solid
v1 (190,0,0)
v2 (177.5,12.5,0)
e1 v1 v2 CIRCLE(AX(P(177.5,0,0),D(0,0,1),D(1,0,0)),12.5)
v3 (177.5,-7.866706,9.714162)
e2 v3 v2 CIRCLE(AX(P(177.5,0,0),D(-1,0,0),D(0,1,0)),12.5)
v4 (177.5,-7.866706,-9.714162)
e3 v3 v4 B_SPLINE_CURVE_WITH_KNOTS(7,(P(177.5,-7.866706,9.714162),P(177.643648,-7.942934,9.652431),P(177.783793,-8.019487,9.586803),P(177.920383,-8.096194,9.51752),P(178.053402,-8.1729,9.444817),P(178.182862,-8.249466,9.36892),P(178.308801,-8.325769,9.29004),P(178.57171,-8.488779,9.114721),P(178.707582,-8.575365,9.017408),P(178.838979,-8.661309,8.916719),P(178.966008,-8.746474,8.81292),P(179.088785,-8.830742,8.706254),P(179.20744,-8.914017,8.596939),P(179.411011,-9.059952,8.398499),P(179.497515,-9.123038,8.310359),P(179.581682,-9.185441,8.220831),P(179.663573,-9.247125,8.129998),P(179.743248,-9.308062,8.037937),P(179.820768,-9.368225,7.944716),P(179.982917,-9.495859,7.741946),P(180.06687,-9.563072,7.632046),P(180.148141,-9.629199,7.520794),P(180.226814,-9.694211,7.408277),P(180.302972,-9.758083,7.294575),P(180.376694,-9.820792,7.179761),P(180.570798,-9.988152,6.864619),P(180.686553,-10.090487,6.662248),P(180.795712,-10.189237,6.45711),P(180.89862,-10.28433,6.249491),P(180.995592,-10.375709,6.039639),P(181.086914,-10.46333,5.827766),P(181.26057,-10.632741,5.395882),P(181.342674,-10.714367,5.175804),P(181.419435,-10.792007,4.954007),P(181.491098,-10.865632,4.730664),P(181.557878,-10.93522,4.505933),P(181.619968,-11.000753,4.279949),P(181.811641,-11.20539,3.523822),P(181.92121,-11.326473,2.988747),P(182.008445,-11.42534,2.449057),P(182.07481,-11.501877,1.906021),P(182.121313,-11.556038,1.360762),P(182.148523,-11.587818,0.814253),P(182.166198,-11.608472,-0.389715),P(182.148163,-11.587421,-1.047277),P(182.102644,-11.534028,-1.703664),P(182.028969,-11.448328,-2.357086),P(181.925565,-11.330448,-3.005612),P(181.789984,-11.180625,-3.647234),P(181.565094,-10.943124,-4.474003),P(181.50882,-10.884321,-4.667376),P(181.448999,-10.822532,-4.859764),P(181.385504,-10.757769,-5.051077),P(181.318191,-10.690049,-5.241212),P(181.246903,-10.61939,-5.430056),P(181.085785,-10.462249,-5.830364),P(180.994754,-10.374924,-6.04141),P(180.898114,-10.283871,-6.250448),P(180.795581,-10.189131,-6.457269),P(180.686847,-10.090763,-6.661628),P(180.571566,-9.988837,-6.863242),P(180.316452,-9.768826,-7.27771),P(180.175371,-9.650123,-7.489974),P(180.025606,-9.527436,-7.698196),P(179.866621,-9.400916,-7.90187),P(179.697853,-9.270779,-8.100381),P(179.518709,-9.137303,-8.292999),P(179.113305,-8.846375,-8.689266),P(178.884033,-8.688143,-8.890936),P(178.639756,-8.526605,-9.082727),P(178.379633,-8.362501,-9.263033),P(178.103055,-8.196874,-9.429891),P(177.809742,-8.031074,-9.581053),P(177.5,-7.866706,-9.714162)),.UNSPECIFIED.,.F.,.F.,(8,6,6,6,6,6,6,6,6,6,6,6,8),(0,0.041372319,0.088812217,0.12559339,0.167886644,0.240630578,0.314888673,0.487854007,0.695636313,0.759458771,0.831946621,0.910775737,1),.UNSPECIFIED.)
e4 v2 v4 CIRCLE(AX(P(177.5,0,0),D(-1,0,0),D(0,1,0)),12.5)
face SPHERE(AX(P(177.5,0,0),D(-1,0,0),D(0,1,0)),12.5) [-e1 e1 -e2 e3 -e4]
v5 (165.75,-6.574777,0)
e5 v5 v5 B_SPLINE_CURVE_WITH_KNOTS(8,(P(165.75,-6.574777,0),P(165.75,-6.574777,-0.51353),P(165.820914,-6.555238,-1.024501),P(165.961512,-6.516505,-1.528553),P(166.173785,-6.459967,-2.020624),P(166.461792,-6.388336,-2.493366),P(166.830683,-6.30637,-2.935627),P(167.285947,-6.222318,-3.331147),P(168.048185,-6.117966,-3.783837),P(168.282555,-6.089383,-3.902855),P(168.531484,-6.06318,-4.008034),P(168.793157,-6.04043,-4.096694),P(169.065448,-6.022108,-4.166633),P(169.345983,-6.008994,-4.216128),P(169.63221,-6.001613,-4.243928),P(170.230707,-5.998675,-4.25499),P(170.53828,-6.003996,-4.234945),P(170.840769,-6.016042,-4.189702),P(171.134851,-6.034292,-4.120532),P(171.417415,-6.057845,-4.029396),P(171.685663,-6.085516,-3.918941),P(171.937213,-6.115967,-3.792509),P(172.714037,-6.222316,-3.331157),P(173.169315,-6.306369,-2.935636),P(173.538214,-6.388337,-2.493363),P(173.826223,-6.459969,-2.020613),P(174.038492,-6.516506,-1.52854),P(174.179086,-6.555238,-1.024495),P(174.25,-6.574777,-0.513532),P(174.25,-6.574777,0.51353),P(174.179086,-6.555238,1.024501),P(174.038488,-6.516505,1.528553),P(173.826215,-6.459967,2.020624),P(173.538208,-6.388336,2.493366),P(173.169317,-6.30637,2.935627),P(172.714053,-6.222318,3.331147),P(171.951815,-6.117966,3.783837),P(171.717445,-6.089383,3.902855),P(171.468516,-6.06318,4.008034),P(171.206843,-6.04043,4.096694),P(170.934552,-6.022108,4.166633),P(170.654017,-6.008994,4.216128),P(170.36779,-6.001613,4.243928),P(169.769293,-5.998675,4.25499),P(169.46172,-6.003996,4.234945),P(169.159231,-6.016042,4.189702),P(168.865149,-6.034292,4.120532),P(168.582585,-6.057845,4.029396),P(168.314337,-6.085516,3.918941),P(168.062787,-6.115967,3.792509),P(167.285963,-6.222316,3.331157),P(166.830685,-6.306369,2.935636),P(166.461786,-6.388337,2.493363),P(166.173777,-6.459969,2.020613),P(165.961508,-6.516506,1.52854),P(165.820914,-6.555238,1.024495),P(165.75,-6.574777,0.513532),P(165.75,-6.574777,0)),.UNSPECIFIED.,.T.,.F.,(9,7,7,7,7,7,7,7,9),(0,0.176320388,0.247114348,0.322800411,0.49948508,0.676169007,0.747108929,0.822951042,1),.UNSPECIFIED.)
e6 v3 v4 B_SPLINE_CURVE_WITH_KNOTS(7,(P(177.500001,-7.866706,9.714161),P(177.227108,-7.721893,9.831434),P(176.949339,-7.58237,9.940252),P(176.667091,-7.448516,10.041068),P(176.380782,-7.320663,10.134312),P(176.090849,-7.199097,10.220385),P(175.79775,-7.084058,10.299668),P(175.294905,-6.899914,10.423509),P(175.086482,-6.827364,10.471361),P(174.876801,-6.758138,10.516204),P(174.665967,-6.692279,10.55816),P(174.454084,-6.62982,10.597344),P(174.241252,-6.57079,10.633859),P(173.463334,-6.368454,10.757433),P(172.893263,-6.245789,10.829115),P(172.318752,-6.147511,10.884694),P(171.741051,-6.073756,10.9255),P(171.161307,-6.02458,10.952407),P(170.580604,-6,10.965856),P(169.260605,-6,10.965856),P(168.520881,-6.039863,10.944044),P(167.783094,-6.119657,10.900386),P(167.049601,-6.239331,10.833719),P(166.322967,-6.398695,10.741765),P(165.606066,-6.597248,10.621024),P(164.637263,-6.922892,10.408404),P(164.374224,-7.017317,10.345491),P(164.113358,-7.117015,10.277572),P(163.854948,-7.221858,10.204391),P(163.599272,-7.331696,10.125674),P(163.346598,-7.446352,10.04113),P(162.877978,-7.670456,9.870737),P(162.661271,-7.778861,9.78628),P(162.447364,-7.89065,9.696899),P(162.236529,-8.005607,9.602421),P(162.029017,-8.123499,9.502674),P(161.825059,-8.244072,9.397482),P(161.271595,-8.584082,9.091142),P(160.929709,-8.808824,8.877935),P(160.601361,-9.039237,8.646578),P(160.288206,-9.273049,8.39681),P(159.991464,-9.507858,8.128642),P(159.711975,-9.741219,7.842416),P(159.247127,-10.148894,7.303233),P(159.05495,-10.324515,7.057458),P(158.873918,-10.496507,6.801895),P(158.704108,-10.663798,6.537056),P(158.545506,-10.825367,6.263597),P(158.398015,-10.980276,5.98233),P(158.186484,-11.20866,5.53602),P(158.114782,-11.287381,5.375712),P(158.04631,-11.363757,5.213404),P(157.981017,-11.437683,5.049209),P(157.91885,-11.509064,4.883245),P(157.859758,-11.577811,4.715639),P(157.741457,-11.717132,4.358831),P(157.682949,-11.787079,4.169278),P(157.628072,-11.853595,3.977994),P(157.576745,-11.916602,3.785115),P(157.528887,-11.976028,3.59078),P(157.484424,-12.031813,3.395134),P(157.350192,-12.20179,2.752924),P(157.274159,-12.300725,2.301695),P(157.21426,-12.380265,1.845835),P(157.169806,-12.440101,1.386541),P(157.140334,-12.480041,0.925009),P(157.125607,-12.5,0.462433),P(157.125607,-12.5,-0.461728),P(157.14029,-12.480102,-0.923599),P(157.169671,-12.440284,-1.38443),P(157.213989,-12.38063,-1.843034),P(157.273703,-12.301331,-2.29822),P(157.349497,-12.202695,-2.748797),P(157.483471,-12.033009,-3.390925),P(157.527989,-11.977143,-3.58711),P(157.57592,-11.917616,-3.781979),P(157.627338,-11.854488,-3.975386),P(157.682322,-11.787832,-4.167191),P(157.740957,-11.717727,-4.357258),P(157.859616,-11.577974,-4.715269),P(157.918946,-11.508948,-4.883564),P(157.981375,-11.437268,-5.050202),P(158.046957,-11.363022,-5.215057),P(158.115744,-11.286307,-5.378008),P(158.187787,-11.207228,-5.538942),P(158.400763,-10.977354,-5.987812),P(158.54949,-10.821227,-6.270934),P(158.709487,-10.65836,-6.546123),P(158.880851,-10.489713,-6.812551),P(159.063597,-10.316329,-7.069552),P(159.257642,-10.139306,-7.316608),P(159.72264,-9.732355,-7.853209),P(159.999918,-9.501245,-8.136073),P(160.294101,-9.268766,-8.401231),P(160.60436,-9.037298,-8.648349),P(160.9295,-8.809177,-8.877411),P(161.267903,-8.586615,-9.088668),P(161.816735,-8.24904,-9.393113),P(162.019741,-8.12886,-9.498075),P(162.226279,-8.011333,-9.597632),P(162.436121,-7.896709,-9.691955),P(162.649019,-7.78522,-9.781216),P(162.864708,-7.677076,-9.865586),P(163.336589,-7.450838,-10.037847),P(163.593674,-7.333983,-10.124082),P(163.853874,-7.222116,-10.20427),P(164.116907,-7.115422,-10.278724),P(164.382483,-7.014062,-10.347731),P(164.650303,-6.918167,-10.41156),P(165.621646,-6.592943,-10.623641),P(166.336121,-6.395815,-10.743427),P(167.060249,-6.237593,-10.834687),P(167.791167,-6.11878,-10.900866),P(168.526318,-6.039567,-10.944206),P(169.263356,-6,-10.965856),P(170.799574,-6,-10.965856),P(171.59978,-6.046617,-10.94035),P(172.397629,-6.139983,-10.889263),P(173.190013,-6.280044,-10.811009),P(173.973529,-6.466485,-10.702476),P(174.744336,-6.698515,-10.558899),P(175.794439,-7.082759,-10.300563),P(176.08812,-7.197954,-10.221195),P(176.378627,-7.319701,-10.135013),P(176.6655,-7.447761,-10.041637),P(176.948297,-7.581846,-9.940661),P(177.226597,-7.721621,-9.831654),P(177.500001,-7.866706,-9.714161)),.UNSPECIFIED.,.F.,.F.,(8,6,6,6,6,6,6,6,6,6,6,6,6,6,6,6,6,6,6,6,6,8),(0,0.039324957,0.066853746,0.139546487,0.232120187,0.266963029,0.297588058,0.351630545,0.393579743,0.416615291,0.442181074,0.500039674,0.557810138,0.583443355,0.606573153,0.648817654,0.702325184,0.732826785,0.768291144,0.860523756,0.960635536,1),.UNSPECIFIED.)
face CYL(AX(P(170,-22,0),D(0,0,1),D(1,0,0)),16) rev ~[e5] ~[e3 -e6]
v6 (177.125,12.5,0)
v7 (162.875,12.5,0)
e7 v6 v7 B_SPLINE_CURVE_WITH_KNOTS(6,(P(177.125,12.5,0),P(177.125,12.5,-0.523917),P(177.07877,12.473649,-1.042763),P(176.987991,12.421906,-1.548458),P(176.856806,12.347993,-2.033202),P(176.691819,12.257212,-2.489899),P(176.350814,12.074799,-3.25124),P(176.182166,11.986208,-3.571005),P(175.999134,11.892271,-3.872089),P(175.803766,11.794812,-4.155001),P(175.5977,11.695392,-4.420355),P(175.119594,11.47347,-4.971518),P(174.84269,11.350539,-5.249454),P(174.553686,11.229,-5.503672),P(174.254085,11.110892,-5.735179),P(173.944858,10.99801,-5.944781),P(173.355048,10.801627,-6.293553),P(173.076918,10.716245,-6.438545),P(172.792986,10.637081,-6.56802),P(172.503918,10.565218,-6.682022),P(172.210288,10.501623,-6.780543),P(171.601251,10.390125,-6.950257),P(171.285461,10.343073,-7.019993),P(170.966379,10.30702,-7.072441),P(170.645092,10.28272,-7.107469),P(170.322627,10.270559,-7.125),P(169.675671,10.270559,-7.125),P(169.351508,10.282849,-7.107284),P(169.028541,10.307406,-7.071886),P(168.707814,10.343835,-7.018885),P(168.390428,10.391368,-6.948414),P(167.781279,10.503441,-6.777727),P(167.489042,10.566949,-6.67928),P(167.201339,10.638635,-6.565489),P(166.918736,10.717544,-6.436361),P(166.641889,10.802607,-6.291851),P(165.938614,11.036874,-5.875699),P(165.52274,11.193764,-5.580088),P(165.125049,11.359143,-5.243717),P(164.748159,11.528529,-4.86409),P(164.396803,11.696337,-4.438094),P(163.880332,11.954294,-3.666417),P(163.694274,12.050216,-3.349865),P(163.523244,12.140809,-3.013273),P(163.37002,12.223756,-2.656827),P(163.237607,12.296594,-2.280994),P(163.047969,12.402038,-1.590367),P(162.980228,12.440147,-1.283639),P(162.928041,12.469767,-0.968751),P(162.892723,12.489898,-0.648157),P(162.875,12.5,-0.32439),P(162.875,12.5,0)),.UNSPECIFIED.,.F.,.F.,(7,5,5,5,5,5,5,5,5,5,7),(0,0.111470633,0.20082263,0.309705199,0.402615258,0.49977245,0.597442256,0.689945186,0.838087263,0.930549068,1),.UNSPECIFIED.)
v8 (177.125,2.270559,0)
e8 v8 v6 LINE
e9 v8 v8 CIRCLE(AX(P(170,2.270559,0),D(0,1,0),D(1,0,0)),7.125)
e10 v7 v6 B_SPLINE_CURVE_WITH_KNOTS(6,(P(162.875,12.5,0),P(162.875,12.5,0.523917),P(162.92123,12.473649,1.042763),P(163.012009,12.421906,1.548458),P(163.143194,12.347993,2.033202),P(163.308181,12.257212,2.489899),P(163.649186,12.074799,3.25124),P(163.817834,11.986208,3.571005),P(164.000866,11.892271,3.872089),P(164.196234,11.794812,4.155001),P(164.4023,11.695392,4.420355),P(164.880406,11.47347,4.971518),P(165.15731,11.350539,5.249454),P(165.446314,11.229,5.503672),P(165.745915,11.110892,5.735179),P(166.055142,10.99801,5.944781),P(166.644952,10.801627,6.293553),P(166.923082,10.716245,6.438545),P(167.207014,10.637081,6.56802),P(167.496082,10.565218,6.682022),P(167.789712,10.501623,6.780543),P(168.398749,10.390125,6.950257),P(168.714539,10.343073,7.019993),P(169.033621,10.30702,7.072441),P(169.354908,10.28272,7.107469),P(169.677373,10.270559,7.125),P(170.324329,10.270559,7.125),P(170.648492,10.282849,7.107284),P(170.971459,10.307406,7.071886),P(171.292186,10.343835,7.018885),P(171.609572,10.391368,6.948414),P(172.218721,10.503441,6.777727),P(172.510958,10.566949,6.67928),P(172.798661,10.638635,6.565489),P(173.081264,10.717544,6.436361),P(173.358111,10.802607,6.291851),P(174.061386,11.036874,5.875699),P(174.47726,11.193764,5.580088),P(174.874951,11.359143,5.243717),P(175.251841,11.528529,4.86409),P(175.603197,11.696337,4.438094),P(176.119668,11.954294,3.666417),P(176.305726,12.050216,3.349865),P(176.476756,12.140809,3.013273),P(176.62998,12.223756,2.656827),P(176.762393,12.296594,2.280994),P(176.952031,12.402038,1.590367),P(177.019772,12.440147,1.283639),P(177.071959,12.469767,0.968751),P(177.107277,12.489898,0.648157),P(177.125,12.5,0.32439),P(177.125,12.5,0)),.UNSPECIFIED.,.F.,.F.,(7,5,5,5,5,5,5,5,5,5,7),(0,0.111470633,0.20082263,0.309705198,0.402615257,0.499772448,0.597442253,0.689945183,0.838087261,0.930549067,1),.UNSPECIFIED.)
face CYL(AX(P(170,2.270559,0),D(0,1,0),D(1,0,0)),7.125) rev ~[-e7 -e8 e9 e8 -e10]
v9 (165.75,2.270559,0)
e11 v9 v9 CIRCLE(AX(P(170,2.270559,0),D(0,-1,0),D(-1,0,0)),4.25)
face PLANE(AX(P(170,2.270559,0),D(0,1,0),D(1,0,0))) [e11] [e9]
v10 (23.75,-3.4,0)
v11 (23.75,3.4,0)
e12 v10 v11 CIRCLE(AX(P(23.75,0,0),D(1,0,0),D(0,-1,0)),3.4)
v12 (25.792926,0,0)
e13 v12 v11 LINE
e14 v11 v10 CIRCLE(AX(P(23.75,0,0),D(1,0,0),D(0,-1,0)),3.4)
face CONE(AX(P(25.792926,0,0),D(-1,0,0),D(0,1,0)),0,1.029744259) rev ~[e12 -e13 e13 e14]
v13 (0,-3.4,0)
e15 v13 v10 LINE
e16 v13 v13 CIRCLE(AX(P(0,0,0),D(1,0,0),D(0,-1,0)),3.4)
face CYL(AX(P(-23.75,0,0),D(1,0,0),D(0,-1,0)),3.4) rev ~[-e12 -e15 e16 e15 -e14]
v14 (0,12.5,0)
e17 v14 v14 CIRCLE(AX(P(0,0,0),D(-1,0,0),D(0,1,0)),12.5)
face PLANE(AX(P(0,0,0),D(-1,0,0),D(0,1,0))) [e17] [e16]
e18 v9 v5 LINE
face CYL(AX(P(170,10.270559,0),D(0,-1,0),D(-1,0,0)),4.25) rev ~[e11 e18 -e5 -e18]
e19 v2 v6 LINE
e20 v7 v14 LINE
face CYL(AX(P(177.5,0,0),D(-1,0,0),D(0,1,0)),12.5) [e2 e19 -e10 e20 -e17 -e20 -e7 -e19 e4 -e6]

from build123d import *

# Parameters (mm, degrees)
F3_R           = 16
F4_DEPTH       = 15
F6_D           = 6.8
F6_DEPTH       = 23.75
F6_TIP         = 2.0429261047
F9_D           = 8.5
F9_START       = 2.2294414
F9_CBORE_D     = 14.25
F9_CBORE_DEPTH = 8


with BuildPart() as f2:
    # F0 (on Top) → F2 (revolve)
    with BuildSketch(Plane.XY):
        with BuildLine():
            Line((0, 12.5), (0, 0))
            Line((0, 0), (190, 0))
            ThreePointArc((190, 0), (186.3388347648, 8.8388347648), (177.5, 12.5))
            Line((177.5, 12.5), (0, 12.5))
        make_face()
    revolve(axis=Axis((6.2984433025, 0, 0), (-1, 0, 0)))

    # F3 (on Top) → F4 (cut, symmetric)
    with BuildSketch(Plane.XY):
        with Locations((170, -22)):
            Circle(F3_R)
    extrude(amount=F4_DEPTH, both=True, mode=Mode.SUBTRACT)

    # F6
    with Locations(Plane(origin=(0, 0, 0), x_dir=(0, 1, 0), z_dir=(-1, 0, 0))):
        with Locations((0, 0)):
            Hole(F6_D / 2, depth=F6_DEPTH)
            with Locations((0, 0, -(F6_DEPTH + F6_TIP / 2))):  # 118° drill point
                Cone(0, F6_D / 2, F6_TIP, mode=Mode.SUBTRACT)

    # F9 (through all)
    # its depths count from where the whole tool has entered the part; down to there all is cleared
    with Locations(Plane(origin=(0, 12.5, 0), x_dir=(1, 0, 0), z_dir=(0, 1, 0)).offset(-F9_START)):
        with Locations((170, 0)):
            CounterBoreHole(F9_D / 2, F9_CBORE_D / 2, F9_CBORE_DEPTH)


solid = f2.part
